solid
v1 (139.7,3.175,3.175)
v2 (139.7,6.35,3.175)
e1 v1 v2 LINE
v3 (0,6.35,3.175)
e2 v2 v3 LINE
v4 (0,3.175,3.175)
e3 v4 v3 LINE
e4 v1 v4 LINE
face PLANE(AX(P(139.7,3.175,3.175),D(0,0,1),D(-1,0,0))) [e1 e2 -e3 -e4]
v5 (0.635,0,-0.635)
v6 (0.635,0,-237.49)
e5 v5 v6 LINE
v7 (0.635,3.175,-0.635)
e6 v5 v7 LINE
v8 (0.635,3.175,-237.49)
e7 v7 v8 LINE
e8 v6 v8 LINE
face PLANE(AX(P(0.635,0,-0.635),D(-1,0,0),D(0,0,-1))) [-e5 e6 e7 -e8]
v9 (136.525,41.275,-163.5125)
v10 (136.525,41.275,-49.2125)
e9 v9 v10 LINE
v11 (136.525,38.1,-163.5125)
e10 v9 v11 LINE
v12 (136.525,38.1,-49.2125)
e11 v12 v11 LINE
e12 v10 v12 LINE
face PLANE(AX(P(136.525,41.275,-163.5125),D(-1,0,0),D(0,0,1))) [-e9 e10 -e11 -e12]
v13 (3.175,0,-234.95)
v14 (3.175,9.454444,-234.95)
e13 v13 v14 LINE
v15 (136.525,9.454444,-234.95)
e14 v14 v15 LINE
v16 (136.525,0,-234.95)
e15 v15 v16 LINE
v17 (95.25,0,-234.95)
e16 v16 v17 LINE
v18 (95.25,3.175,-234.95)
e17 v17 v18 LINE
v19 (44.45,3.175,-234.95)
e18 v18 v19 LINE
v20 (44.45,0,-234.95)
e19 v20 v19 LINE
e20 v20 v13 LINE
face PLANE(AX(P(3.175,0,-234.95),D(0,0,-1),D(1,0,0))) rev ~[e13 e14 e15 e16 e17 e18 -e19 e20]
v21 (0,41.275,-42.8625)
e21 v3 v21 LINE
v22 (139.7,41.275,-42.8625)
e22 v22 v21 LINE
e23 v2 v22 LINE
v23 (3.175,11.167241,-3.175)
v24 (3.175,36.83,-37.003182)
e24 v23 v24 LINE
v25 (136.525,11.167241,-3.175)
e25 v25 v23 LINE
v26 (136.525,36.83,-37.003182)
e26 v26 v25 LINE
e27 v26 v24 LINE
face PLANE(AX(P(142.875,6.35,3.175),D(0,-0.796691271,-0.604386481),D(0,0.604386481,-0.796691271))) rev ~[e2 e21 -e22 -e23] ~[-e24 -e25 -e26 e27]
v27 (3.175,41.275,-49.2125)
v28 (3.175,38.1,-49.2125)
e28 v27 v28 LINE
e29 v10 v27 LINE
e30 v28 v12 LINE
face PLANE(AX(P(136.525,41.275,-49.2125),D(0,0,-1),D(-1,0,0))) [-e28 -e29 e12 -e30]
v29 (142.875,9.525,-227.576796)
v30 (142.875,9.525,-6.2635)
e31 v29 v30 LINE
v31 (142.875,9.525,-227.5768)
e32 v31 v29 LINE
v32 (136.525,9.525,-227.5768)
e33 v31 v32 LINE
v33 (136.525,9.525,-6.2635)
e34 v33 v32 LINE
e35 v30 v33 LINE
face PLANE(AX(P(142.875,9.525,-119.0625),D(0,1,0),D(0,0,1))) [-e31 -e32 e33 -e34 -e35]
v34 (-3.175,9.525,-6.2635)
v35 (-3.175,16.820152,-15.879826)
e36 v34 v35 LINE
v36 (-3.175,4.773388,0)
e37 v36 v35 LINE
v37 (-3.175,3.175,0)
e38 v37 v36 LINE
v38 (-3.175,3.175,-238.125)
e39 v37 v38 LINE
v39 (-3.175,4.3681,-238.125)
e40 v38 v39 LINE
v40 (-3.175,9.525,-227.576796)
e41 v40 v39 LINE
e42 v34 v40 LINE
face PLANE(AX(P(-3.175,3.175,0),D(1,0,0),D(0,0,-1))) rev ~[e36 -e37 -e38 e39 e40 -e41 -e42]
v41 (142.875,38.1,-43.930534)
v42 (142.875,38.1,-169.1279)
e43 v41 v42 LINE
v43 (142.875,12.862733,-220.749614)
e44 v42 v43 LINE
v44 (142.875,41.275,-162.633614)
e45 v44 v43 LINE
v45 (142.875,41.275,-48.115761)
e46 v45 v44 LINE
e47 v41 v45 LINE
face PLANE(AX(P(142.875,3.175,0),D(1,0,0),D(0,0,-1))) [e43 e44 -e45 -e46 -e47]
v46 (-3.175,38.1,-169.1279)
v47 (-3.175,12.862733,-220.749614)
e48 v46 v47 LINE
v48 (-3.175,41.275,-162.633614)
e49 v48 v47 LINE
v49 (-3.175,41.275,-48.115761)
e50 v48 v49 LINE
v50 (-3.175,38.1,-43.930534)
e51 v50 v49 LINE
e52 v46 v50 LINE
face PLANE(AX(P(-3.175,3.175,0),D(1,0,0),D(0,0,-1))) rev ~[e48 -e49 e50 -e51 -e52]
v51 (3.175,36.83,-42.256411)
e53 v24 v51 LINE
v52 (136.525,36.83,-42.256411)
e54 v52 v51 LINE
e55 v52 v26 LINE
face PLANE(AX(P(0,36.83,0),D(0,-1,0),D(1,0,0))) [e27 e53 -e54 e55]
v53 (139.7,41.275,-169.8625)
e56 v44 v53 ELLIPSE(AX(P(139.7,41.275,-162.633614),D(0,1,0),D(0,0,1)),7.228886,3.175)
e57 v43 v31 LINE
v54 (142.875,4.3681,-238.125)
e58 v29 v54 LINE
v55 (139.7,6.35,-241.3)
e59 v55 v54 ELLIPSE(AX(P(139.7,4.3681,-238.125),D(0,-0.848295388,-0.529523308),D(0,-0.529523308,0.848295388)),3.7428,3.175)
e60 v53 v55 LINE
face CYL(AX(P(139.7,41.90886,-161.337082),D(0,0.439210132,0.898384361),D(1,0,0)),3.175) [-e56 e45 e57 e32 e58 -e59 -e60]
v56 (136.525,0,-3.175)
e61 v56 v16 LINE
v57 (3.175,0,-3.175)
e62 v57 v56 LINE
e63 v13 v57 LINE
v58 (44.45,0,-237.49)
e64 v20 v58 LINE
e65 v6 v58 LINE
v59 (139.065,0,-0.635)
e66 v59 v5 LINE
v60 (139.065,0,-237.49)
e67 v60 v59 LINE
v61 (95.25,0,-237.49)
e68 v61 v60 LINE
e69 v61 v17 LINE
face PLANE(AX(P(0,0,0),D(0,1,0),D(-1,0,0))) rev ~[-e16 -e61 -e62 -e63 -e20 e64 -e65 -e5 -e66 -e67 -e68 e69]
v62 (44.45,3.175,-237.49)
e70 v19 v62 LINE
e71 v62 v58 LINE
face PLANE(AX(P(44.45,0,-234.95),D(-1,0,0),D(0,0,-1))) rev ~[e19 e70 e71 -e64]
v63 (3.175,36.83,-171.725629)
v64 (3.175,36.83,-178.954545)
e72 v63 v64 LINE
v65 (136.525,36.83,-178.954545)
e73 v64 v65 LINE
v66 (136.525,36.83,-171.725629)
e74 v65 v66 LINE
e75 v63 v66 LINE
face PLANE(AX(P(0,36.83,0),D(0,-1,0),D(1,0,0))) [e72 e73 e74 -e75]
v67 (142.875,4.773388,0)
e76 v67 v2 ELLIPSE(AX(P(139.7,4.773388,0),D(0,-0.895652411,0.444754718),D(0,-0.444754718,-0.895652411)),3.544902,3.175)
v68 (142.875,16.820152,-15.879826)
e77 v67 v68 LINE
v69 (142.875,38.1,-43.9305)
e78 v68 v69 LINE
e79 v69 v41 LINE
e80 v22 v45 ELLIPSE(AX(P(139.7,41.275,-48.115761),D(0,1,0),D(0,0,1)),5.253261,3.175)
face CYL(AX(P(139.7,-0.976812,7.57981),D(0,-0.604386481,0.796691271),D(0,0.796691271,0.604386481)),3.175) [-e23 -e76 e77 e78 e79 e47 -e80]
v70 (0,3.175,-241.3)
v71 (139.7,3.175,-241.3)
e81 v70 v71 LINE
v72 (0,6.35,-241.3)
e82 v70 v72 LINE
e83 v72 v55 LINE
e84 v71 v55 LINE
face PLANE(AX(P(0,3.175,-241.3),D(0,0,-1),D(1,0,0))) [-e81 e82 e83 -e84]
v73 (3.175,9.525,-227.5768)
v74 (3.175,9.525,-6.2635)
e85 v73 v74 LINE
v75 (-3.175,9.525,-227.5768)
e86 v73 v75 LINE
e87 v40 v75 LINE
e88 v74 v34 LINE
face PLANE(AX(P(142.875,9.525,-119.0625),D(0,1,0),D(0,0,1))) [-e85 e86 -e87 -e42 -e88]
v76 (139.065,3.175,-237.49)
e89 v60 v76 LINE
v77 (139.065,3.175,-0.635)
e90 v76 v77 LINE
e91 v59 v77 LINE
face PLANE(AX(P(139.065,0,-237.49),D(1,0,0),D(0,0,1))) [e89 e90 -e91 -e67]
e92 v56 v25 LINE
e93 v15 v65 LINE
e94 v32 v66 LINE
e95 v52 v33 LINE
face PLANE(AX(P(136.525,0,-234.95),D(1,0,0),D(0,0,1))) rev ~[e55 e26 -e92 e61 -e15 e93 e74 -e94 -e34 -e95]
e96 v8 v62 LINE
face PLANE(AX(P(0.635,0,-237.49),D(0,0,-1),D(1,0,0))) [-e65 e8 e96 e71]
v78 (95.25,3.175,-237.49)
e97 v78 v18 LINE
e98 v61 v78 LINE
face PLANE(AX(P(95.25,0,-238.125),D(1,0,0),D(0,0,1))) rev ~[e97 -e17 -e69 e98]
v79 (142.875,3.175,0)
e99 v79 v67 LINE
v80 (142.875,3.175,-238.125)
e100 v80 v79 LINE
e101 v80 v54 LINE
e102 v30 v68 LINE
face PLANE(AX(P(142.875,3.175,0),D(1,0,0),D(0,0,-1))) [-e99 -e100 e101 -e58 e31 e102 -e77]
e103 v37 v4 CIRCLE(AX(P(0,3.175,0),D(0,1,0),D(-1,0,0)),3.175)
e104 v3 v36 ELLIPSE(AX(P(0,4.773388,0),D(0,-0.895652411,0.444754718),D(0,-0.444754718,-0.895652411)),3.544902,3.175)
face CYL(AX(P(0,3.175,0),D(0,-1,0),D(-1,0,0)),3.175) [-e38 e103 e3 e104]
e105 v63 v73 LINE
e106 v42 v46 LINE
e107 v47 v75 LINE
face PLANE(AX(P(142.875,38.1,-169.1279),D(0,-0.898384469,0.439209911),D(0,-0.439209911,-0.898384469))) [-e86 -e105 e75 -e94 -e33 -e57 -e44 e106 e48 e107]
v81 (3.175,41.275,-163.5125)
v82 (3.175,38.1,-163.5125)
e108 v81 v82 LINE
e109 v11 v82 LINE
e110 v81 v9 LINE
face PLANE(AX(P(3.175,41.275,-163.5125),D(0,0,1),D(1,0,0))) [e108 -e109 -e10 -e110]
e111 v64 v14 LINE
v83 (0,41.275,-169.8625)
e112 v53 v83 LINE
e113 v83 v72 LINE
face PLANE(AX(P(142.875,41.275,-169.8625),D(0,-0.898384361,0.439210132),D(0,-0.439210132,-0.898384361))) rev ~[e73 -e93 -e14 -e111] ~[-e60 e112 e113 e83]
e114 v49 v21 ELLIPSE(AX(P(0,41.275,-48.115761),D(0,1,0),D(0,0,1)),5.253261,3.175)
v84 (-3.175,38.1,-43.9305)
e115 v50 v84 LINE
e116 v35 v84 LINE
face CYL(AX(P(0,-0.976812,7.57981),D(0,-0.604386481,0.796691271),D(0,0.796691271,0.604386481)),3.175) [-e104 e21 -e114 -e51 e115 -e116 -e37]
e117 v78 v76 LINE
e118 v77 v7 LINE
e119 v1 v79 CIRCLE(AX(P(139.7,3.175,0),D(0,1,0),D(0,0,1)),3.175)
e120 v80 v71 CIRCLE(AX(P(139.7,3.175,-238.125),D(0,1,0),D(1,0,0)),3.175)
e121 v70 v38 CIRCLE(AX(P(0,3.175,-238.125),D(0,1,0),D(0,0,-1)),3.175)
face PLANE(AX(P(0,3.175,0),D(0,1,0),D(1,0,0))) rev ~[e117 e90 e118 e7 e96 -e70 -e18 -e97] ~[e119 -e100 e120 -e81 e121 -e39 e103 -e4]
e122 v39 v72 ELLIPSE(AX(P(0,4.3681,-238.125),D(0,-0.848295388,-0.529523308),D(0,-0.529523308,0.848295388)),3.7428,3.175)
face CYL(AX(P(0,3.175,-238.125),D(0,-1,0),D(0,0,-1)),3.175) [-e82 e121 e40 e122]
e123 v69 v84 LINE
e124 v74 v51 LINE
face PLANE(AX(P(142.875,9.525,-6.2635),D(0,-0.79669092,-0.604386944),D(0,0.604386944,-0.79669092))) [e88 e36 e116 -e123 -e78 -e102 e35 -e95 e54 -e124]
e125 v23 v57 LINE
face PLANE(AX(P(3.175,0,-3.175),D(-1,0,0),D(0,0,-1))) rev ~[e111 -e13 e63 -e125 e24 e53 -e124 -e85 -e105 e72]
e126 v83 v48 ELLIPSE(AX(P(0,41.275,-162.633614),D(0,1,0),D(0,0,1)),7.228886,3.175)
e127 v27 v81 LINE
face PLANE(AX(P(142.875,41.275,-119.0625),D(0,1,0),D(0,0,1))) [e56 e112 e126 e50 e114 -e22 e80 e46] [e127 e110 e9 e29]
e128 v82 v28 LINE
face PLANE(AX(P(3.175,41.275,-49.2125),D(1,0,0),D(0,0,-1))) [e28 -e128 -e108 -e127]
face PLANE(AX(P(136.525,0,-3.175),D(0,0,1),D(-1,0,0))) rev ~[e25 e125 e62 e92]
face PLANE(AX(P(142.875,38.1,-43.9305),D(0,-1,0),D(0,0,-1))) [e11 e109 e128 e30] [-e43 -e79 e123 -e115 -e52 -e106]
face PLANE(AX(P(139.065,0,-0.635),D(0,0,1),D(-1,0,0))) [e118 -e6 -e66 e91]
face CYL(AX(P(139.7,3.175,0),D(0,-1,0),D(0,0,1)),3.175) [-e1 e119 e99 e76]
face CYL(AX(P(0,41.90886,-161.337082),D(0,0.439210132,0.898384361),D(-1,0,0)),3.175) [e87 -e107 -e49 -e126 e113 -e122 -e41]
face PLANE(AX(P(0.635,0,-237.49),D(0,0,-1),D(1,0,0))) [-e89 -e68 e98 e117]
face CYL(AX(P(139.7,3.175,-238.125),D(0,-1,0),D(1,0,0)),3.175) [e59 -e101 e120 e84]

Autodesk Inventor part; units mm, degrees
ref_plane "YZ Plane" through (0, 0, 0) normal (1, 0, 0) x (0, 1, 0)
ref_plane "XZ Plane" through (0, 0, 0) normal (0, 1, 0) x (-1, 0, 0)
ref_plane "XY Plane" through (0, 0, 0) normal (0, 0, 1) x (1, 0, 0)
sketch "Sketch1" plane through (0, 0, 0) normal (0, 1, 0) x (-1, 0, 0)
  line L0 (0, 0) -> (-139.7, 0)
  line L1 (-139.7, 0) -> (-139.7, -238.125)
  line L2 (-139.7, -238.125) -> (0, -238.125)
  line L3 (0, -238.125) -> (0, 0)
  line L4 (-3.175, -3.175) -> (-136.525, -3.175)
  line L5 (-136.525, -3.175) -> (-136.525, -234.95)
  line L6 (-136.525, -234.95) -> (-3.175, -234.95)
  line L7 (-3.175, -234.95) -> (-3.175, -3.175)
  line L8 (0, -238.125) -> (-139.7, -238.125)
  line L9 (-69.85, -238.125) -> (-59.69, -238.125)
  line L10 (-59.69, -238.125) -> (-80.01, -238.125)
  line L11 (-80.01, -234.95) -> (-59.69, -234.95)
  line L12 (-69.85, -238.125) -> (-69.85, -234.95)
  line L13 (-69.85, -238.125) -> (-44.45, -238.125)
  line L14 (-44.45, -238.125) -> (-95.25, -238.125)
  line L15 (-95.25, -238.125) -> (-95.25, -234.95)
  line L16 (-95.25, -234.95) -> (-44.45, -234.95)
  line L17 (-44.45, -234.95) -> (-44.45, -238.125)
  line L18 (-44.45, -238.125) -> (-95.25, -238.125)
  dimension "d0" = 139.7
  dimension "d1" = 238.125
  dimension "d2" = 3.175
  dimension "d45" = 25.4
  dimension "d46" = 50.8
extrude "Extrusion1" add sketch "Sketch1" along normal blind 3.175 contours L3 L2 L17 L6 L7 L4 L5 L15 L1 L0
sketch "Sketch2" plane through (0, 3.175, 0) normal (0, 1, 0) x (1, 0, 0)
  line L0 (0, 238.125) -> (0, 0) projected
  line L1 (139.7, 238.125) -> (0, 238.125) projected
  line L2 (0, 0) -> (139.7, 0)
  line L3 (139.7, 0) -> (139.7, 238.125)
  line L4 (139.7, 238.125) -> (0, 238.125)
  line L5 (0, 238.125) -> (0, 0)
  line L6 (139.7, -3.175) -> (0, -3.175)
  line L7 (-3.175, 0) -> (-3.175, 238.125)
  line L8 (0, 241.3) -> (139.7, 241.3)
  line L9 (142.875, 238.125) -> (142.875, 0)
  arc A0 (0, 241.3) -> (-3.175, 238.125) centre (0, 238.125) ccw
  arc A1 (-3.175, 0) -> (0, -3.175) centre (0, 0) ccw
  arc A2 (139.7, -3.175) -> (142.875, 0) centre (139.7, 0) ccw
  arc A3 (142.875, 238.125) -> (139.7, 241.3) centre (139.7, 238.125) ccw
  line L10 (136.525, 3.175) -> (3.175, 3.175) projected
  line L11 (139.7, 234.95) -> (3.175, 234.95)
  line L12 (3.175, 234.95) -> (3.175, 3.175)
  line L13 (3.175, 3.175) -> (139.7, 3.175)
  line L14 (139.7, 3.175) -> (139.7, 234.95)
  point P0 (80.01, 238.125)
  point P1 (139.7, 3.175)
  point P2 (139.7, 234.95)
  dimension "d7" = 3.175
extrude "Extrusion2" add sketch "Sketch2" along normal blind 3.175 contours L1 L3 L11 L12 L10 L13 L2 L0 | L3 L13 L10 L12 L11 | L6 A1 L7 A0 L8 A3 L9 A2
sketch "Sketch3" plane through (142.875, 3.175, 0) normal (1, 0, 0) x (0, 0, -1)
  line L0 (-3.175, 3.175) -> (241.3, 3.175)
  line L1 (0, 3.175) -> (238.125, 3.175) projected
  line L2 (119.0625, 3.175) -> (119.0625, 38.1)
  line L3 (119.0625, 38.1) -> (42.8625, 38.1)
  line L4 (119.0625, 38.1) -> (169.8625, 38.1)
  line L5 (-3.175, 3.175) -> (42.8625, 38.1)
  line L6 (169.8625, 38.1) -> (241.3, 3.175)
  line L7 (43.9305, 34.925) -> (119.0625, 34.925)
  line L8 (119.0625, 34.925) -> (169.1279, 34.925)
  line L9 (169.1279, 34.925) -> (227.5768, 6.35)
  line L10 (227.5768, 6.35) -> (6.2635, 6.35)
  line L11 (6.2635, 6.35) -> (43.9305, 34.925)
  point P0 (0, -3.175)
  dimension "d10" = 34.925
  dimension "d11" = 76.2
  dimension "d12" = 50.8
  dimension "d13" = 3.175
extrude "Extrusion3" add sketch "Sketch3" against normal blind 146.05 contours L5 L3 L2 L7 L11 L10 L0 | L2 L10 L9 L8 L4 L6 L0
sketch "Sketch4" plane through (0, 0, 0) normal (0, -1, 0) x (1, 0, 0)
  line L0 (0, 0) -> (139.7, 0) projected
  line L1 (0, -238.125) -> (139.7, -238.125) projected
  line L2 (0, 0) -> (139.7, 0)
  line L3 (139.7, 0) -> (139.7, -238.125)
  line L4 (139.7, -238.125) -> (0, -238.125)
  line L5 (0, -238.125) -> (0, 0)
  line L6 (136.525, -234.95) -> (136.525, -3.175)
  line L7 (136.525, -3.175) -> (3.175, -3.175)
  line L8 (3.175, -3.175) -> (3.175, -234.95)
  line L9 (3.175, -234.95) -> (136.525, -234.95)
extrude "Extrusion4" cut sketch "Sketch4" against normal blind 36.83 contours L9 L8 L7 L6
sketch "Sketch7" plane through (142.875, 41.275, -42.8625) normal (0, 1, 0) x (1, 0, 0)
  line L0 (-146.05, -36.599) -> (-146.05, 184.7143) projected
  line L1 (-146.05, 0) -> (0, 0)
  line L2 (0, 0) -> (0, 127)
  line L3 (0, 127) -> (-146.05, 127)
  line L4 (-146.05, 127) -> (-146.05, 0)
  line L5 (-139.7, 120.65) -> (-6.35, 120.65)
  line L6 (-6.35, 120.65) -> (-6.35, 6.35)
  line L7 (-6.35, 6.35) -> (-139.7, 6.35)
  line L8 (-139.7, 6.35) -> (-139.7, 120.65)
  point P0 (-142.875, -42.8625)
  dimension "d36" = 6.35
extrude "Extrusion6" cut sketch "Sketch7" against normal blind 36.83 contours L5 L6 L7 L8
fillet "Fillet1" radius 3.175 1 edges at (142.875, 23.8125, -19.8437)
fillet "Fillet2" radius 3.175 1 edges at (142.875, 23.8125, -205.5813)
fillet "Fillet3" radius 3.175 2 edges at (-3.175, 23.8125, -19.8437) (-3.175, 23.8125, -205.5813)
sketch "Sketch8" plane through (0, 0, 0) normal (0, -1, 0) x (1, 0, 0)
  line L0 (0, 0) -> (139.7, 0)
  line L1 (139.7, 0) -> (139.7, -238.125)
  line L2 (139.7, -238.125) -> (0, -238.125)
  line L3 (0, -238.125) -> (0, 0)
  line L4 (0.635, -237.49) -> (139.065, -237.49)
  line L5 (139.065, -237.49) -> (139.065, -0.635)
  line L6 (139.065, -0.635) -> (0.635, -0.635)
  line L7 (0.635, -0.635) -> (0.635, -237.49)
  dimension "d42" = 0.635
extrude "Extrusion7" cut sketch "Sketch8" against normal blind 3.175
properties part number "TopLid_3DPrint"
